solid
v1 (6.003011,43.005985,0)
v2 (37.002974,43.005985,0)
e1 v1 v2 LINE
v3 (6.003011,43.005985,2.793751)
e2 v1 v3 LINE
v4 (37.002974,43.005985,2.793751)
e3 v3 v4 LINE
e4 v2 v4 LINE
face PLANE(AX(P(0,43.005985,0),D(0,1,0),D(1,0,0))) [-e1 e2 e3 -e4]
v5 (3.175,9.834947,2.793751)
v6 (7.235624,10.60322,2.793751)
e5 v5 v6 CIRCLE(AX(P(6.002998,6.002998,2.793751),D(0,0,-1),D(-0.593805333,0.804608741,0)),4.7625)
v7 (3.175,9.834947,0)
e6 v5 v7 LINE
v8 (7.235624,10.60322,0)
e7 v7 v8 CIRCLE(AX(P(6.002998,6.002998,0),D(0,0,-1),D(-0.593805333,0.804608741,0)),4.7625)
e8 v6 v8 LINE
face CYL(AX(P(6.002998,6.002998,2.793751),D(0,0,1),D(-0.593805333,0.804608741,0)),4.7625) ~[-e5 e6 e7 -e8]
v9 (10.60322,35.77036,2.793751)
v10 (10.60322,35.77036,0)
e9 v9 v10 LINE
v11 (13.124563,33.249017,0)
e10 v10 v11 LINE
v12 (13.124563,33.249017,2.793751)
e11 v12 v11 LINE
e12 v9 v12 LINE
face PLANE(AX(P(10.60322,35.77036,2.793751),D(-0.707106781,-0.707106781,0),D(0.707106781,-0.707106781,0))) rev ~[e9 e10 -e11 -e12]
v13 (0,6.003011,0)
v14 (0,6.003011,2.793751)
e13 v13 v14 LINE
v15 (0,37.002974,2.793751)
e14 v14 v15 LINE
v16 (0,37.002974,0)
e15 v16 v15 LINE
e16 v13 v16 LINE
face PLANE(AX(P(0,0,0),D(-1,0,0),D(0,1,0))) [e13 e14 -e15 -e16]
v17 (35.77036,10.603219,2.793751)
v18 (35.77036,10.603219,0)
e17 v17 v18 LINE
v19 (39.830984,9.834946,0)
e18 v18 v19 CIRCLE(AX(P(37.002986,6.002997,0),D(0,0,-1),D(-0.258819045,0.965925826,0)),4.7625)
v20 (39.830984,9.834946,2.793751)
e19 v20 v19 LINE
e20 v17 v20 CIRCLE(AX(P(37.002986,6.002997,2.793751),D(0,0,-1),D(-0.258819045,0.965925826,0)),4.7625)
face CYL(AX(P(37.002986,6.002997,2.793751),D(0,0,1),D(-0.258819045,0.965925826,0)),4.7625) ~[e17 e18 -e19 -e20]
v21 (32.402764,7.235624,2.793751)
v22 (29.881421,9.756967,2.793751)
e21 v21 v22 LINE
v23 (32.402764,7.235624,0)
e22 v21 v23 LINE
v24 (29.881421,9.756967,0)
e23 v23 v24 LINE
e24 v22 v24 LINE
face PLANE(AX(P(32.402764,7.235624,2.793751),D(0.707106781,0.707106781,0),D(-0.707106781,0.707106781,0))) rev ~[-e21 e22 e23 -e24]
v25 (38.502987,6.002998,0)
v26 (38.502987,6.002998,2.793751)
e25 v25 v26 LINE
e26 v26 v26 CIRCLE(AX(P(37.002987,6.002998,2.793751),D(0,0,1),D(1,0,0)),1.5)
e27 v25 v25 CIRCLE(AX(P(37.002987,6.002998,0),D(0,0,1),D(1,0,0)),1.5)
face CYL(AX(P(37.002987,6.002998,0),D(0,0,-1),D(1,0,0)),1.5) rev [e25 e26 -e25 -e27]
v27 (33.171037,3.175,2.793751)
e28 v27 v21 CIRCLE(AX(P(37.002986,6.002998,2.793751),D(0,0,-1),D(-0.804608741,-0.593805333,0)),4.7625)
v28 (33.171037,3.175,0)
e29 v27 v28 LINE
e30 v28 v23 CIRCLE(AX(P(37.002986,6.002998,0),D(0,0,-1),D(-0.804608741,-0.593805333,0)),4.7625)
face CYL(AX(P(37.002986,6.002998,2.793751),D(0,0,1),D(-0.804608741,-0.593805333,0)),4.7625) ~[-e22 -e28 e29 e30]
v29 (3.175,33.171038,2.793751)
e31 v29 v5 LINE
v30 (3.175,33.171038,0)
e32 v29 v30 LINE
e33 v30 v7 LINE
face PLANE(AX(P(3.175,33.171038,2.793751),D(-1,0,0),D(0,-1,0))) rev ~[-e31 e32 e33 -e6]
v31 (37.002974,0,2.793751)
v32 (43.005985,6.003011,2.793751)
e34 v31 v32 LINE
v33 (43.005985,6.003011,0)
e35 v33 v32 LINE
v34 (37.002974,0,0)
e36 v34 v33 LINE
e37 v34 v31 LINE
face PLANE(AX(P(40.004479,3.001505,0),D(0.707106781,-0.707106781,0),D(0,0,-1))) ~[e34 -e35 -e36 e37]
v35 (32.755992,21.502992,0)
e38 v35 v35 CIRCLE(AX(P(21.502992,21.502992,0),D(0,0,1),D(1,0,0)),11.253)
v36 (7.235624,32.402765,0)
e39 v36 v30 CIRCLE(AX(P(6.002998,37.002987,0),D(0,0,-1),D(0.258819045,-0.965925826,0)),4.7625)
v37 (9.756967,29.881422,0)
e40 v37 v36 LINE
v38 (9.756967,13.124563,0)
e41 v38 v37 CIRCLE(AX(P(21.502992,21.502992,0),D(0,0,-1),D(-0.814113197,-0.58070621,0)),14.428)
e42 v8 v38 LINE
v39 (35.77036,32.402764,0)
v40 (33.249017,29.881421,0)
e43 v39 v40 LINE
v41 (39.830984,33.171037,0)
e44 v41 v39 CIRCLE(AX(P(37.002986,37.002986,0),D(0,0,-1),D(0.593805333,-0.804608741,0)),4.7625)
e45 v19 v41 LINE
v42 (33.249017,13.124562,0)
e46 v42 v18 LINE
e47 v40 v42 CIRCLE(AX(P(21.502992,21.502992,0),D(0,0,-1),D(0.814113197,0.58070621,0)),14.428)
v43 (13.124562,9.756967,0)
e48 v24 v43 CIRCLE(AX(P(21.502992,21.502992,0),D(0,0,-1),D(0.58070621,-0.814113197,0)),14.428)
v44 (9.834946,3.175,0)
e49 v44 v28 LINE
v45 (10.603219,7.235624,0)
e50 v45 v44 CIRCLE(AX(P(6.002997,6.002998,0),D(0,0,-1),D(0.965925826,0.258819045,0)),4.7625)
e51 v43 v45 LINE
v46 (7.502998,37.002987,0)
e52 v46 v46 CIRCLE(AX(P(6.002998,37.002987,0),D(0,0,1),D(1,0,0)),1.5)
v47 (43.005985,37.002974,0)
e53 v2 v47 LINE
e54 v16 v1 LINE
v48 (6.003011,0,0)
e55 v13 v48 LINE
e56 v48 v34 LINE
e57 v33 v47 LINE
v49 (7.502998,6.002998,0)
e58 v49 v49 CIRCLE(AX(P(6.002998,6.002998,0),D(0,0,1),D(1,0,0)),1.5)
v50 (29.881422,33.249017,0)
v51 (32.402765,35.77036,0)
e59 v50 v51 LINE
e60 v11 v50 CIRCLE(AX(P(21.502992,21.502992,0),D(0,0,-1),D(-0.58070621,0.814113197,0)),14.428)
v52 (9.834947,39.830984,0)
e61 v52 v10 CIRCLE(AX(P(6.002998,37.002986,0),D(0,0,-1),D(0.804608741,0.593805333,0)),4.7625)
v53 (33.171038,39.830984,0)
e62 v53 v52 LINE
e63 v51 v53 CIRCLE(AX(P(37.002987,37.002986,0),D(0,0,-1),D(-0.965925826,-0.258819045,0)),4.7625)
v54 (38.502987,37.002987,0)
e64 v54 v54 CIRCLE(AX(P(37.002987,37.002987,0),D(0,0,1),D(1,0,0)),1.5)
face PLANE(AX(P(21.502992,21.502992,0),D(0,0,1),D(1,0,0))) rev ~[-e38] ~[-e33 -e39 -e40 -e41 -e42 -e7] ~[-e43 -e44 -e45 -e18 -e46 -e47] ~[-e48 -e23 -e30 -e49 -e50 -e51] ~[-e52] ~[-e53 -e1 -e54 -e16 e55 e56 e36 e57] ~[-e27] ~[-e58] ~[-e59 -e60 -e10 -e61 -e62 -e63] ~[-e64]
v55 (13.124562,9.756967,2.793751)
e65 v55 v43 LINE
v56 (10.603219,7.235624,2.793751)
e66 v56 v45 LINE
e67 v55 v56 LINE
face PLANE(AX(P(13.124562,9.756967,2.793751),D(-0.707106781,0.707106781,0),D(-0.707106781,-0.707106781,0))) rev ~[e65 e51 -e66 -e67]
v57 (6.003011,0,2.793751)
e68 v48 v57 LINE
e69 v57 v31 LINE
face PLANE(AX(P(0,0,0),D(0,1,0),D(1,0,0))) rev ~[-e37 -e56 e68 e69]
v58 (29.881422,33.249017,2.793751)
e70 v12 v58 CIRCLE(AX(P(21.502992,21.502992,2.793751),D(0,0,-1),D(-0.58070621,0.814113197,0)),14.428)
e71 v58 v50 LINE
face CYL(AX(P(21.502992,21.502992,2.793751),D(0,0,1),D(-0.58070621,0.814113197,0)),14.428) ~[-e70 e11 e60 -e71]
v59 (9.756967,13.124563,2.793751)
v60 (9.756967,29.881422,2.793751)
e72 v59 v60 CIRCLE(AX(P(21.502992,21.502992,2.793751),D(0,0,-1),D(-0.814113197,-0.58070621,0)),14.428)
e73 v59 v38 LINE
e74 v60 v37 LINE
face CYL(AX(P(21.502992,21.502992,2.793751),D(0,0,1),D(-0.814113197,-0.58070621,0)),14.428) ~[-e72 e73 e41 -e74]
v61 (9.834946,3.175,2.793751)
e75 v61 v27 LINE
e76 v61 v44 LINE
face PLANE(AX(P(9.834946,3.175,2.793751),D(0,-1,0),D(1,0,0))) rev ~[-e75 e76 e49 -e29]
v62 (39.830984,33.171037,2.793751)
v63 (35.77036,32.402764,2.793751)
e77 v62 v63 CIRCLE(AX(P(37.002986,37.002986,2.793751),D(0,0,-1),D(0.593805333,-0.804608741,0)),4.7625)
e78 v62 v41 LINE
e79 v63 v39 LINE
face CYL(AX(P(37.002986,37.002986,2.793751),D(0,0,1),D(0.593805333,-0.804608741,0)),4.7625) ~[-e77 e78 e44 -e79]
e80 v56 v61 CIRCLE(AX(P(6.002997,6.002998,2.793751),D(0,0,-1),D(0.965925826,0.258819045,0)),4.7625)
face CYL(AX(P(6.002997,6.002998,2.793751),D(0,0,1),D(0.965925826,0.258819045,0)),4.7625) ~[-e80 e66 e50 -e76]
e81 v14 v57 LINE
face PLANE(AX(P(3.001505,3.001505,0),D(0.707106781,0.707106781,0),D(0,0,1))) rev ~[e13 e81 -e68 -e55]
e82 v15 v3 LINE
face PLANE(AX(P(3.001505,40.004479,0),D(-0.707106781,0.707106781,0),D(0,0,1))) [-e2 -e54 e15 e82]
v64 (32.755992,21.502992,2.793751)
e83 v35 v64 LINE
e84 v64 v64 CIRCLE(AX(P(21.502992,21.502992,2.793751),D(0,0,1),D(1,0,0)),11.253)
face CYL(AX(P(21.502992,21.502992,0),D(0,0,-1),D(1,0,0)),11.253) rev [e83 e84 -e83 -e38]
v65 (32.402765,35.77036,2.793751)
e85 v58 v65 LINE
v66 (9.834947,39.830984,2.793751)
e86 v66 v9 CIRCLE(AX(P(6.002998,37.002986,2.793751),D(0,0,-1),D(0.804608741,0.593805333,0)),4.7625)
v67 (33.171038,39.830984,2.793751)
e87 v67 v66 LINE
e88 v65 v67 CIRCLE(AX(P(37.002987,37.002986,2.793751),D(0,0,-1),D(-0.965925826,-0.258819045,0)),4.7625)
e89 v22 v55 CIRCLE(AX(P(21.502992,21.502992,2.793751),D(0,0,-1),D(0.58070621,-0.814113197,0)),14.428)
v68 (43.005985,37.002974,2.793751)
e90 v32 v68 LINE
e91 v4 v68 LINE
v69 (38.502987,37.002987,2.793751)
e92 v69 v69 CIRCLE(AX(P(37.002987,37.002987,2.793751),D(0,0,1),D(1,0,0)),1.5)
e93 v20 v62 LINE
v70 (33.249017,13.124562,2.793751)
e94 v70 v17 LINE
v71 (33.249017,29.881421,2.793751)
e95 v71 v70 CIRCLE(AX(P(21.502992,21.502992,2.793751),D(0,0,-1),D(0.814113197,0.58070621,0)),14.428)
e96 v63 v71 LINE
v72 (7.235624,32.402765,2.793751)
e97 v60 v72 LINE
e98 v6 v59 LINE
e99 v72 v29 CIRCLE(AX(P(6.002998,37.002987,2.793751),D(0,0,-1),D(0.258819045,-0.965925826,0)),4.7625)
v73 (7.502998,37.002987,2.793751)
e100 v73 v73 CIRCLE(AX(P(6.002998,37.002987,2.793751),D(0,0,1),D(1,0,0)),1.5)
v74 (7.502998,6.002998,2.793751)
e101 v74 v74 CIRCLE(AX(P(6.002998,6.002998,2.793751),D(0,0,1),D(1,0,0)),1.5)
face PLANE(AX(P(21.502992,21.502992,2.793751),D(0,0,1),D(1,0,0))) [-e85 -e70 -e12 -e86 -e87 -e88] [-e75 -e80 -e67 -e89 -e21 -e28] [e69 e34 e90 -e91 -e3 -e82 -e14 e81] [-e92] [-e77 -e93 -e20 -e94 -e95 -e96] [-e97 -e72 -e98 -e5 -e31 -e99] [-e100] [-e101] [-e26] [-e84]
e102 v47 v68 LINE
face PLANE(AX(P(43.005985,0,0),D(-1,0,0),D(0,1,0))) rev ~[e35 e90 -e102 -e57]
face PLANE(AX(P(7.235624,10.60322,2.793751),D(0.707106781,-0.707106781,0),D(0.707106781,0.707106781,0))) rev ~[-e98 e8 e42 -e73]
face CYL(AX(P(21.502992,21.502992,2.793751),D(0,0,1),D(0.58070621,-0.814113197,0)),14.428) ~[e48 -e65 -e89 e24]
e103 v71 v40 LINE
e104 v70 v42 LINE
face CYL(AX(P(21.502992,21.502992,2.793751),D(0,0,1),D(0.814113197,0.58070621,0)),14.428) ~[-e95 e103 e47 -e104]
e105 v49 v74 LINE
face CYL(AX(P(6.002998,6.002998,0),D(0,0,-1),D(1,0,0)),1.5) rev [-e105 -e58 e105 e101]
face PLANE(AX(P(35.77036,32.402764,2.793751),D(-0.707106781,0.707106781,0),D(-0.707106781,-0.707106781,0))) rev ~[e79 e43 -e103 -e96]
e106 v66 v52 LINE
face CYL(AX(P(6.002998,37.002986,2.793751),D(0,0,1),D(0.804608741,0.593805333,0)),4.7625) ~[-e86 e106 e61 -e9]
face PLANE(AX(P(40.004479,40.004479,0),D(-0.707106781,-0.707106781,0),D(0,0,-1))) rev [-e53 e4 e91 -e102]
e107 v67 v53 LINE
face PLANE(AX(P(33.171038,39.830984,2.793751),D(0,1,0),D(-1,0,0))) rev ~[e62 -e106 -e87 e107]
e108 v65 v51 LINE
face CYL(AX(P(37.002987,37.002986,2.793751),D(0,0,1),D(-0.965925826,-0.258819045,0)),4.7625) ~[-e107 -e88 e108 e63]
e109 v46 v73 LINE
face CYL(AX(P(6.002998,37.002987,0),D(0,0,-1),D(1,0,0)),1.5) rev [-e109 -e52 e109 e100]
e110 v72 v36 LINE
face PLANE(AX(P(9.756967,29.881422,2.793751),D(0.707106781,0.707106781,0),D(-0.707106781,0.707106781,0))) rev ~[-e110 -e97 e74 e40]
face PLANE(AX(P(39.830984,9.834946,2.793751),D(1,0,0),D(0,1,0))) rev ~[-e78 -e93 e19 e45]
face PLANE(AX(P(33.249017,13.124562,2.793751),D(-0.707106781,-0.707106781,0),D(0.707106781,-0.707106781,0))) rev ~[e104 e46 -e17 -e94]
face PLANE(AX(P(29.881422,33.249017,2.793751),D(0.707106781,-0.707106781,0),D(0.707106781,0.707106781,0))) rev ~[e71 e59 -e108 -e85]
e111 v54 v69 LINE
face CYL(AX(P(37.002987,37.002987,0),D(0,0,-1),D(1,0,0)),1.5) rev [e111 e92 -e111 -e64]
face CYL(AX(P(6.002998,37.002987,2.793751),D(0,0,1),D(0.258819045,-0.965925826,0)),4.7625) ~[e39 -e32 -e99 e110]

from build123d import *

# Parameters (mm, degrees)
F0_W            = 43.0059846
F0_H            = 43.0059846
F0_R            = 1.5
F0_R_2          = 11.2530001
F1_DEPTH        = 2.79375108
F2_SIZE         = 6.0030106
F4_DEPTH        = 2.79375108
F4_COPIES_COUNT = 4


# Not quite as in the source:
# - a pattern or mirror of a feature is missing from the dataset's text; its kind, count and spacing are read off the source's solid


with BuildPart() as f1:
    # F0 (on Top) → F1 (new body)
    with BuildSketch(Plane.XY):
        with Locations((21.5029923, 21.5029923)):
            Rectangle(F0_W, F0_H)
        with Locations((6.0029979, 6.0029979)):
            Circle(F0_R, mode=Mode.SUBTRACT)
        with Locations((21.5029923, 21.5029923)):
            Circle(F0_R_2, mode=Mode.SUBTRACT)
        with Locations((37.0029867, 6.0029979)):
            Circle(F0_R, mode=Mode.SUBTRACT)
        with Locations((6.0029979, 37.0029867)):
            Circle(F0_R, mode=Mode.SUBTRACT)
        with Locations((37.0029867, 37.0029867)):
            Circle(F0_R, mode=Mode.SUBTRACT)
    extrude(amount=F1_DEPTH)

    # F2
    f2_edges = [f1.edges().sort_by_distance(p)[0] for p in [
        (0, 0, 1.396876),
        (0, 43.005985, 1.396876),
        (43.005985, 0, 1.396876),
        (43.005985, 43.005985, 1.396876),
    ]]
    chamfer(f2_edges, length=F2_SIZE)

    # F3 (on face) → F4 (cut, through all)
    with BuildSketch(Plane.XY.offset(2.79375108)):
        with BuildLine():
            ThreePointArc((7.2356236023, 32.4027649523), (5.1176370603, 32.3235056996), (3.175, 33.171037571))
            Line((3.175, 33.171037571), (3.175, 9.834947029))
            ThreePointArc((3.175, 9.834947029), (5.1176370603, 10.6824789004), (7.2356236023, 10.6032196477))
            Line((7.2356236023, 10.6032196477), (9.7569670059, 13.1245630513))
            ThreePointArc((9.7569670059, 13.1245630513), (7.0749922, 21.5029923), (9.7569670059, 29.8814215487))
            Line((9.7569670059, 29.8814215487), (7.2356236023, 32.4027649523))
        make_face()
    f4 = extrude(amount=-F4_DEPTH, mode=Mode.SUBTRACT)

    # F4_copies: F4 ×4 about axis
    f4_copies_axis = Axis((21.502992, 21.502992, 0), (0, 0, 1))
    for i in range(1, F4_COPIES_COUNT):
        add(f4.rotate(f4_copies_axis, i * 360 / F4_COPIES_COUNT), mode=Mode.SUBTRACT)


solid = f1.part
